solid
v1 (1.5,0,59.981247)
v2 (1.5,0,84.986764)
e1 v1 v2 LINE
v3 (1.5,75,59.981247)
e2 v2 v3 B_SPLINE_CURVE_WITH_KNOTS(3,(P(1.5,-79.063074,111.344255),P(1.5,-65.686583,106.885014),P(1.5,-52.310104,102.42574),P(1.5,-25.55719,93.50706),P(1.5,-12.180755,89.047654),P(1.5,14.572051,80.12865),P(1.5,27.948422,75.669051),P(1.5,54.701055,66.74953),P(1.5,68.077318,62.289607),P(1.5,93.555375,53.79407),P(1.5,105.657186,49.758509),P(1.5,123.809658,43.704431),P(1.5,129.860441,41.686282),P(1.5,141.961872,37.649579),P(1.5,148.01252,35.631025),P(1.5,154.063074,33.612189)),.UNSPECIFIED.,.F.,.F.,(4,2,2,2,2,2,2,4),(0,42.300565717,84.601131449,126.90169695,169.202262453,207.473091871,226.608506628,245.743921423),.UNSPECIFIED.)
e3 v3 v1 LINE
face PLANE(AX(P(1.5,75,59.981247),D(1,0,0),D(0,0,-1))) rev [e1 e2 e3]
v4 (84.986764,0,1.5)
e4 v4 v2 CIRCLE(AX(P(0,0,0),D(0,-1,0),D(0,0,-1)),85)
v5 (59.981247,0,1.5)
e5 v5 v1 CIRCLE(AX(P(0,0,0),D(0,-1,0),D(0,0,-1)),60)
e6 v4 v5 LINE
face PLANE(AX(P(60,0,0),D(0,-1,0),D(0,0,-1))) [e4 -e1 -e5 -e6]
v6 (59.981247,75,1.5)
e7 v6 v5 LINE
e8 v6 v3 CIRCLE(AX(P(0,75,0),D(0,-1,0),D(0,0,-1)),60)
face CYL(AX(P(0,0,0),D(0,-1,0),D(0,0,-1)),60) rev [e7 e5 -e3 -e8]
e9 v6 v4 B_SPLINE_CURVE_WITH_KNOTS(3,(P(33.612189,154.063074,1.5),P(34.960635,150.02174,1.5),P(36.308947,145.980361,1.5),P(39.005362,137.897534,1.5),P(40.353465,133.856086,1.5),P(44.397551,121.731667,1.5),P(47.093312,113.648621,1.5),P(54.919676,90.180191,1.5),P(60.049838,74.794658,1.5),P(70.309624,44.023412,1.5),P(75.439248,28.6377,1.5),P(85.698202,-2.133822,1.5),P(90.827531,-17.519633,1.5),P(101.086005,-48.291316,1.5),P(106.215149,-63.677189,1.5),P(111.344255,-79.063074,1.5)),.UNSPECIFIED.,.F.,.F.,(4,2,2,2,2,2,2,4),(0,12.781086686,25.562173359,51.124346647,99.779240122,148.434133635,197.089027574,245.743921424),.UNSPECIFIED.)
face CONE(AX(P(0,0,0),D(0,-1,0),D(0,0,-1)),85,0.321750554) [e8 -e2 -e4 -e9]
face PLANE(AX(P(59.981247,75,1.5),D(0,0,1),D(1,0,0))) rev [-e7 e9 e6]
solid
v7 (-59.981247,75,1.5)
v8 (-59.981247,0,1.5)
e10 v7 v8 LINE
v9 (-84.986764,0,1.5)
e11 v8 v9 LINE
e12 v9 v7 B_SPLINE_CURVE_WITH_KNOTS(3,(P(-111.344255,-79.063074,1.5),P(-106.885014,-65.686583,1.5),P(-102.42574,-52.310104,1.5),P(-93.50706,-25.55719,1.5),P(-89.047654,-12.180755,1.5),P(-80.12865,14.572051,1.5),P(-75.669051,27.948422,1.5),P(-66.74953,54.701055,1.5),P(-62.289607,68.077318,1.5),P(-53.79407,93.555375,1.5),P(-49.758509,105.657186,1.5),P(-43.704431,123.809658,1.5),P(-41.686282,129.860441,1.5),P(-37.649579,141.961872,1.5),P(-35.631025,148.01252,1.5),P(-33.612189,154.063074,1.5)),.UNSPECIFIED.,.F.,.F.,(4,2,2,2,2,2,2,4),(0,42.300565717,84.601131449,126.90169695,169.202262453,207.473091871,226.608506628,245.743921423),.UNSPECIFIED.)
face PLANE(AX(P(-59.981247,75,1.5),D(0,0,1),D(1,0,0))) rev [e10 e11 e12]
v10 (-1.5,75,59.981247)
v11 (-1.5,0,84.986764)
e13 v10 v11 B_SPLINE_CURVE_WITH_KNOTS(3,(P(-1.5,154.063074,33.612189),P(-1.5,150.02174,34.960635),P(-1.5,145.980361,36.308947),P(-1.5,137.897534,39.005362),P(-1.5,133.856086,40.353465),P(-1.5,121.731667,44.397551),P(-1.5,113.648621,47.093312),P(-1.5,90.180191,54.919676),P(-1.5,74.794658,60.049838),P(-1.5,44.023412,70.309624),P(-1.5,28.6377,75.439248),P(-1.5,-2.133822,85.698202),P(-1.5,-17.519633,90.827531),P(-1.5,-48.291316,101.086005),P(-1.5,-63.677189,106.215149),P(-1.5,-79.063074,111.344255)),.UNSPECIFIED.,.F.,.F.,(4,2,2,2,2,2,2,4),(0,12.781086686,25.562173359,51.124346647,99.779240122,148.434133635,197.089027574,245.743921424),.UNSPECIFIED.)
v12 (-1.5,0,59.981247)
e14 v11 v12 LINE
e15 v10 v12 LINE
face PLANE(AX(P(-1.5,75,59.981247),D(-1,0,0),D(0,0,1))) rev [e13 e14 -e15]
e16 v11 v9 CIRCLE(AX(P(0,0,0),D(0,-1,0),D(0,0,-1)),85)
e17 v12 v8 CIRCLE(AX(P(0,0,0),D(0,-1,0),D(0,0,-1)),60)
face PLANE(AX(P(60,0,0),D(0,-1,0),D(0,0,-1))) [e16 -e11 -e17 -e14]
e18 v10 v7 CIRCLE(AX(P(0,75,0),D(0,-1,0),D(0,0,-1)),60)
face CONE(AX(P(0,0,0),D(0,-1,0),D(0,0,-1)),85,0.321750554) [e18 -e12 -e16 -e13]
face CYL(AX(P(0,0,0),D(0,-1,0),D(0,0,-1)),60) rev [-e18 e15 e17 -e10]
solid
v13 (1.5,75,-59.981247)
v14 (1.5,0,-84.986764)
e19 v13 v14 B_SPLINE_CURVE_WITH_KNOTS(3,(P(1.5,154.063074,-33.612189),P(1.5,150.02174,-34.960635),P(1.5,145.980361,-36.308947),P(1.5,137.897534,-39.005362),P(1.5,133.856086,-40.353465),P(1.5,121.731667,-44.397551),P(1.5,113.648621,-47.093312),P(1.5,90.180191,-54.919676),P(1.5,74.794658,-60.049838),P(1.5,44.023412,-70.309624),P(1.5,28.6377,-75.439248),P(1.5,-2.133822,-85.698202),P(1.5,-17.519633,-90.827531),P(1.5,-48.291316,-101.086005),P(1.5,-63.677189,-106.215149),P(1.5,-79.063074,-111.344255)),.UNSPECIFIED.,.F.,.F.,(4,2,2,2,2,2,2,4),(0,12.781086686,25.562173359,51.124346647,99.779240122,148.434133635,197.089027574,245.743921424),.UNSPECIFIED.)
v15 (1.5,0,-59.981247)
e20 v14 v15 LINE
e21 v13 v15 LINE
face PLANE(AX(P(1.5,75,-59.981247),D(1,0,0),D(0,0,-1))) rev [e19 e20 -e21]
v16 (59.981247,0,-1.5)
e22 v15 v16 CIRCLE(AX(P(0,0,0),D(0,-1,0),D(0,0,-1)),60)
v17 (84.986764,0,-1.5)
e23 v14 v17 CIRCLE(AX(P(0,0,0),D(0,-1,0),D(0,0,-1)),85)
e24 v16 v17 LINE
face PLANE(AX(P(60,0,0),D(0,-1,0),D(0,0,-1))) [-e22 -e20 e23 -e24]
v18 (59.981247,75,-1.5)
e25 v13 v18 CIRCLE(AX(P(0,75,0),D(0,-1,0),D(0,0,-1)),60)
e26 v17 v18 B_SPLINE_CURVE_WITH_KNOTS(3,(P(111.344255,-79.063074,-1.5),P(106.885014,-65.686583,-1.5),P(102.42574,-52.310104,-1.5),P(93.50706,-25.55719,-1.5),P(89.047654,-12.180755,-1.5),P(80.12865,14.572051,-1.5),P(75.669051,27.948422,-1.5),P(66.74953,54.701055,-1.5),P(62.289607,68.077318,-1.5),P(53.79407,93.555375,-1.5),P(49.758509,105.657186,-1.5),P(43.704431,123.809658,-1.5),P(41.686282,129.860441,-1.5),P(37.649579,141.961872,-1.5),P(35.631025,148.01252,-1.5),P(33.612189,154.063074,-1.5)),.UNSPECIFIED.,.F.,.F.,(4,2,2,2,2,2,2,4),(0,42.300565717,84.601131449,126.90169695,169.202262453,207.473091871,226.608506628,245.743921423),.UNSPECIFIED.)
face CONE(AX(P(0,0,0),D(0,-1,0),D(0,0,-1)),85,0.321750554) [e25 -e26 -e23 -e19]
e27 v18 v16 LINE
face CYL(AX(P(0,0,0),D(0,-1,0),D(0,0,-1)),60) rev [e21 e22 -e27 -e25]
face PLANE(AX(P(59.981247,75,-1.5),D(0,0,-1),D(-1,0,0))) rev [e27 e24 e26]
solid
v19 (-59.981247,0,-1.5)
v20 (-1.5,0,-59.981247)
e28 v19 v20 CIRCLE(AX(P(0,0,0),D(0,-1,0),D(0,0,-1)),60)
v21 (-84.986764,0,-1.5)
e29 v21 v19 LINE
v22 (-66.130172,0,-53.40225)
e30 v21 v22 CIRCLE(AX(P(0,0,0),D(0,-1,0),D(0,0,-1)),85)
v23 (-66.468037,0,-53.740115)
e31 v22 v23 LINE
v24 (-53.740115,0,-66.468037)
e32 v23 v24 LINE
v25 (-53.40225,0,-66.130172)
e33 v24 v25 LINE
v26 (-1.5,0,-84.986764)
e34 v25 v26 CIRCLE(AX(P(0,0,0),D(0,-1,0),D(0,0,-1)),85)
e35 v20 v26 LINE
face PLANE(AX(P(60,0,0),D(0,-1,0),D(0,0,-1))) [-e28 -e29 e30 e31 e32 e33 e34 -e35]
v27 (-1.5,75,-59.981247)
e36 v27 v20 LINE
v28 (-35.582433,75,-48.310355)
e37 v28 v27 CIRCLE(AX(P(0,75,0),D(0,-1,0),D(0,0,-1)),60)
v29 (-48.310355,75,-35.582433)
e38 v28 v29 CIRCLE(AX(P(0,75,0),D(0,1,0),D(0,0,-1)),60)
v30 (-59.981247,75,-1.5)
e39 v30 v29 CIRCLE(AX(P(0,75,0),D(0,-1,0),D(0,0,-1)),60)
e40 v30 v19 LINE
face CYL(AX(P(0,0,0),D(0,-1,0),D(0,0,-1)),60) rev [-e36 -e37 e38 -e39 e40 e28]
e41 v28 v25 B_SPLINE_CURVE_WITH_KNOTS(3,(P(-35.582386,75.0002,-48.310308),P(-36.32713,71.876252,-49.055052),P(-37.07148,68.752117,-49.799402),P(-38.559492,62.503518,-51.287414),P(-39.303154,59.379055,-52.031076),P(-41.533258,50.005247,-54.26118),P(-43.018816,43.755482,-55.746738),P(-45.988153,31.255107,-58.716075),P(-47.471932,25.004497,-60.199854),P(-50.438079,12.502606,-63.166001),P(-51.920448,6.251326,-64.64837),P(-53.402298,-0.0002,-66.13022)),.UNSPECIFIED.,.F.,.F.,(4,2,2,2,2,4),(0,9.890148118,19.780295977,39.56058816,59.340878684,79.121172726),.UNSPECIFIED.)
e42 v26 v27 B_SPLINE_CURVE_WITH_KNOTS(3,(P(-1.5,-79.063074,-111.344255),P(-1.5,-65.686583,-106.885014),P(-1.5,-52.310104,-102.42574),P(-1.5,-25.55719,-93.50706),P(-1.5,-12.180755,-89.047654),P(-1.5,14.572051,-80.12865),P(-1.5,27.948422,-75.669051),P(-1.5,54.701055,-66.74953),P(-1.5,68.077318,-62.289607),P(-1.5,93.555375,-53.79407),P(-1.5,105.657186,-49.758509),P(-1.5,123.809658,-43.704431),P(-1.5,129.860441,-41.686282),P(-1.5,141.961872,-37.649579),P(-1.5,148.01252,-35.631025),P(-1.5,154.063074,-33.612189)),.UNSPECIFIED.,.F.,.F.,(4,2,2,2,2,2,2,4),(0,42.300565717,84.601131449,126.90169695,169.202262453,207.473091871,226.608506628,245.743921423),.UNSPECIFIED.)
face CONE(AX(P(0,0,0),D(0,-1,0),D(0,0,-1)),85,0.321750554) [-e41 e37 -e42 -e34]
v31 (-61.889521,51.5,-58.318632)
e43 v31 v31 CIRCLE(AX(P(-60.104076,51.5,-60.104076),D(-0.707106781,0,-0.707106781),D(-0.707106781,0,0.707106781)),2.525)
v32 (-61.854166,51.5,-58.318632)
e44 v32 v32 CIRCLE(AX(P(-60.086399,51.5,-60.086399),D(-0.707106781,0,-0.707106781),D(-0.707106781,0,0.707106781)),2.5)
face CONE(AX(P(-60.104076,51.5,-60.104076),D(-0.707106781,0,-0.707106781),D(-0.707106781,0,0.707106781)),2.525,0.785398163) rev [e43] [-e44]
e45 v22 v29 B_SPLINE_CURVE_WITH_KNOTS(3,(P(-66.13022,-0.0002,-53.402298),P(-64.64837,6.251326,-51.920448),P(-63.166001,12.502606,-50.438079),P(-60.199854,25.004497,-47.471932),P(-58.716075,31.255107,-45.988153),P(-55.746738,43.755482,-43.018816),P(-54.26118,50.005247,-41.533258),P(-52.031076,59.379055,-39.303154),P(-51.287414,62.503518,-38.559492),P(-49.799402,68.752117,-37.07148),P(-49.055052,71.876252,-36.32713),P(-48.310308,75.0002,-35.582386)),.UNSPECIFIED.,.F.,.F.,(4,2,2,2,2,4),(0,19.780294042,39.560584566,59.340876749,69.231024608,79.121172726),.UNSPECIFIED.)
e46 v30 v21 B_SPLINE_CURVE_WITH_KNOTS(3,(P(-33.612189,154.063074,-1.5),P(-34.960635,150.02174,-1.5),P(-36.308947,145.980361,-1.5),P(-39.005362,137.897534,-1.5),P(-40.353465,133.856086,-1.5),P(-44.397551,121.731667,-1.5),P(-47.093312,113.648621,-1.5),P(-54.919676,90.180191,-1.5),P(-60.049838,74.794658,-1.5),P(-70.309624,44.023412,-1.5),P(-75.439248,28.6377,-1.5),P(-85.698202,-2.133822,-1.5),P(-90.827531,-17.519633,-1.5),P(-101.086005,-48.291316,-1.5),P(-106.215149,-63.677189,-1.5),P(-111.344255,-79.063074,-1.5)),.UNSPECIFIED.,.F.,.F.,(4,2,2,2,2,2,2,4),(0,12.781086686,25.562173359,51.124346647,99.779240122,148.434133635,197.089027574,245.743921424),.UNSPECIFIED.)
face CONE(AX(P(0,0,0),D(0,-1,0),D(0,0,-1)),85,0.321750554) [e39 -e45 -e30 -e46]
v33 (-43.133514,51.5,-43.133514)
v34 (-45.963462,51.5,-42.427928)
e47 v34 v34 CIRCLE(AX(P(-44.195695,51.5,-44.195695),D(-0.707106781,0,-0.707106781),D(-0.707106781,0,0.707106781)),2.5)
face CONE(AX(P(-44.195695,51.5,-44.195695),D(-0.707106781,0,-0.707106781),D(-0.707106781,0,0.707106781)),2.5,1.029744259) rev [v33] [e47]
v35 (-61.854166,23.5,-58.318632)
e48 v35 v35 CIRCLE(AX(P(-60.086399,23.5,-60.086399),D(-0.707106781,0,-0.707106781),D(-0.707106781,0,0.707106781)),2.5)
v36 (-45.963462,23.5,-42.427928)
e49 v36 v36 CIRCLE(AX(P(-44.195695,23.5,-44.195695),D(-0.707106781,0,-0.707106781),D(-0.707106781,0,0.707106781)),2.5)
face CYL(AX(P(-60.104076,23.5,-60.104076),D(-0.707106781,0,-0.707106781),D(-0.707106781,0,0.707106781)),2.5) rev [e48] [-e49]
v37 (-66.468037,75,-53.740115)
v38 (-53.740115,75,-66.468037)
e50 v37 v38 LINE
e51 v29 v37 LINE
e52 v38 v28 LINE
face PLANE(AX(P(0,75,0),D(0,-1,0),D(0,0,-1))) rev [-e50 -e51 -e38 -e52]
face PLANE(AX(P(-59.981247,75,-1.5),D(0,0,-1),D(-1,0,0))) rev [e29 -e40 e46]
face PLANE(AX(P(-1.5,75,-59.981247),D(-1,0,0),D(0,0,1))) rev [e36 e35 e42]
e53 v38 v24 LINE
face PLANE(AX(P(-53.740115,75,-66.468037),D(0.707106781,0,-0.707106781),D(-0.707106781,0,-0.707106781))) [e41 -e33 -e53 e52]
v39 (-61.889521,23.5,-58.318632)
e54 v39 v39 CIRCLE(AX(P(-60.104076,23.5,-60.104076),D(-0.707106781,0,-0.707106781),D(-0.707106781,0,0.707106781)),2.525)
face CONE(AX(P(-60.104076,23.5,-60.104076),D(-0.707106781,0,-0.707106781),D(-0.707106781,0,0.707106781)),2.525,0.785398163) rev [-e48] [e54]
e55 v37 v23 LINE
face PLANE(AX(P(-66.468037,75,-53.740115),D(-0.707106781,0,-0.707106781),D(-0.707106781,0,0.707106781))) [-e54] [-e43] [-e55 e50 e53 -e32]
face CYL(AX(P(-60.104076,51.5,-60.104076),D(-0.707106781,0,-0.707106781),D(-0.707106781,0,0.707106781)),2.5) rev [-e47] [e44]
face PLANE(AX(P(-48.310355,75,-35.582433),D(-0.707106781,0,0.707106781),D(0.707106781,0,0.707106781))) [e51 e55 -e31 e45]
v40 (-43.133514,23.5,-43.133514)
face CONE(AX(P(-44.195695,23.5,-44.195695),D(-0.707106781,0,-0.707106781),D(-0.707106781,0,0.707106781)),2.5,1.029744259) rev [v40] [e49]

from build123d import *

# Parameters (mm, degrees)
SKETCH2_W           = 25.018752931
SKETCH2_H           = 3
SKETCH2_W_2         = 3
SKETCH2_H_2         = 25.018752931
CUT_EXTRUDE1_DEPTH  = 142.686273153
BOSS_EXTRUDE1_DEPTH = 75


# Read off the part's stored shape, not the designer's step: Ø5.0 (5) Diameter Hole1
with BuildPart() as part:
    # Sketch1 → Revolve1 (revolve)
    with BuildSketch(Plane.XY, mode=Mode.PRIVATE) as revolve1_sk:
        Polygon((60, 75), (60, 0), (85, 0), align=None)
    revolve(revolve1_sk.sketch.rotate(Axis((0, 0, 0), (0, 1, 0)), 90), axis=Axis((0, 0, 0), (0, 1, 0)))

    # Sketch2 → Cut-Extrude1 (cut, through all)
    with BuildSketch(Plane.XZ):
        with Locations((72.490623535, 0)):
            Rectangle(SKETCH2_W, SKETCH2_H)
        with Locations((0, -72.490623535)):
            Rectangle(SKETCH2_W_2, SKETCH2_H_2)
        with Locations((-72.490623535, 0)):
            Rectangle(SKETCH2_W, SKETCH2_H)
        with Locations((0, 72.490623535)):
            Rectangle(SKETCH2_W_2, SKETCH2_H_2)
    extrude(amount=-CUT_EXTRUDE1_DEPTH, mode=Mode.SUBTRACT)


with BuildPart() as cut_extrude1_piece_1:
    # of the separate pieces the step leaves, piece 1, a body of its own (cut_extrude1_pieces)
    add(part.part.solids().sort_by_distance((1.5, 75, 59.981247069))[0])


with BuildPart() as cut_extrude1_piece_2:
    # of the separate pieces the step leaves, piece 2, a body of its own (cut_extrude1_pieces)
    add(part.part.solids().sort_by_distance((59.981247069, 75, -1.5))[0])


with BuildPart() as cut_extrude1_piece_3:
    # of the separate pieces the step leaves, piece 3, a body of its own (cut_extrude1_pieces)
    add(part.part.solids().sort_by_distance((-59.981247069, 0, 1.5))[0])


with BuildPart() as cut_extrude1_piece_4:
    # of the separate pieces the step leaves, piece 4, a body of its own (cut_extrude1_pieces)
    add(part.part.solids().sort_by_distance((-1.5, 0, -59.981247069))[0])

    # Sketch3 → Boss-Extrude1 (add)
    with BuildSketch(Plane.XZ):
        with BuildLine():
            Line((-66.468037432, -53.74011537), (-53.74011537, -66.468037432))
            Line((-53.74011537, -66.468037432), (-35.582433332, -48.310355393))
            ThreePointArc((-35.582433332, -48.310355393), (-42.426406871, -42.426406871), (-48.310355393, -35.582433332))
            Line((-48.310355393, -35.582433332), (-66.468037432, -53.74011537))
        make_face()
    extrude(amount=-BOSS_EXTRUDE1_DEPTH)

    # Ø5.0 (5) Diameter Hole1 outline → Ø5.0 (5) Diameter Hole1 (revolve, cut)
    with BuildSketch(Plane(origin=(0, 23.5, 0), x_dir=(0.7071067811865471, 0, -0.707106781186548), z_dir=(0, -1, 0))):
        Polygon((2.5, -62.502151548), (0, -61), (0, -85), (2.525, -85), (2.5, -84.975), align=None)
    revolve(axis=Axis((0, 23.5, 0), (0.707106781186548, 0, 0.7071067811865471)), mode=Mode.SUBTRACT)

    # 5.0 _5_ Diameter Hole1 2 outline → 5.0 _5_ Diameter Hole1 2 (revolve, cut)
    with BuildSketch(Plane(origin=(0, 51.5, 0), x_dir=(0.7071067811865471, 0, -0.707106781186548), z_dir=(0, -1, 0))):
        Polygon((2.5, -62.502151548), (0, -61), (0, -85), (2.525, -85), (2.5, -84.975), align=None)
    revolve(axis=Axis((0, 51.5, 0), (0.707106781186548, 0, 0.7071067811865471)), mode=Mode.SUBTRACT)


solid = Compound([cut_extrude1_piece_1.part, cut_extrude1_piece_2.part, cut_extrude1_piece_3.part, cut_extrude1_piece_4.part])
